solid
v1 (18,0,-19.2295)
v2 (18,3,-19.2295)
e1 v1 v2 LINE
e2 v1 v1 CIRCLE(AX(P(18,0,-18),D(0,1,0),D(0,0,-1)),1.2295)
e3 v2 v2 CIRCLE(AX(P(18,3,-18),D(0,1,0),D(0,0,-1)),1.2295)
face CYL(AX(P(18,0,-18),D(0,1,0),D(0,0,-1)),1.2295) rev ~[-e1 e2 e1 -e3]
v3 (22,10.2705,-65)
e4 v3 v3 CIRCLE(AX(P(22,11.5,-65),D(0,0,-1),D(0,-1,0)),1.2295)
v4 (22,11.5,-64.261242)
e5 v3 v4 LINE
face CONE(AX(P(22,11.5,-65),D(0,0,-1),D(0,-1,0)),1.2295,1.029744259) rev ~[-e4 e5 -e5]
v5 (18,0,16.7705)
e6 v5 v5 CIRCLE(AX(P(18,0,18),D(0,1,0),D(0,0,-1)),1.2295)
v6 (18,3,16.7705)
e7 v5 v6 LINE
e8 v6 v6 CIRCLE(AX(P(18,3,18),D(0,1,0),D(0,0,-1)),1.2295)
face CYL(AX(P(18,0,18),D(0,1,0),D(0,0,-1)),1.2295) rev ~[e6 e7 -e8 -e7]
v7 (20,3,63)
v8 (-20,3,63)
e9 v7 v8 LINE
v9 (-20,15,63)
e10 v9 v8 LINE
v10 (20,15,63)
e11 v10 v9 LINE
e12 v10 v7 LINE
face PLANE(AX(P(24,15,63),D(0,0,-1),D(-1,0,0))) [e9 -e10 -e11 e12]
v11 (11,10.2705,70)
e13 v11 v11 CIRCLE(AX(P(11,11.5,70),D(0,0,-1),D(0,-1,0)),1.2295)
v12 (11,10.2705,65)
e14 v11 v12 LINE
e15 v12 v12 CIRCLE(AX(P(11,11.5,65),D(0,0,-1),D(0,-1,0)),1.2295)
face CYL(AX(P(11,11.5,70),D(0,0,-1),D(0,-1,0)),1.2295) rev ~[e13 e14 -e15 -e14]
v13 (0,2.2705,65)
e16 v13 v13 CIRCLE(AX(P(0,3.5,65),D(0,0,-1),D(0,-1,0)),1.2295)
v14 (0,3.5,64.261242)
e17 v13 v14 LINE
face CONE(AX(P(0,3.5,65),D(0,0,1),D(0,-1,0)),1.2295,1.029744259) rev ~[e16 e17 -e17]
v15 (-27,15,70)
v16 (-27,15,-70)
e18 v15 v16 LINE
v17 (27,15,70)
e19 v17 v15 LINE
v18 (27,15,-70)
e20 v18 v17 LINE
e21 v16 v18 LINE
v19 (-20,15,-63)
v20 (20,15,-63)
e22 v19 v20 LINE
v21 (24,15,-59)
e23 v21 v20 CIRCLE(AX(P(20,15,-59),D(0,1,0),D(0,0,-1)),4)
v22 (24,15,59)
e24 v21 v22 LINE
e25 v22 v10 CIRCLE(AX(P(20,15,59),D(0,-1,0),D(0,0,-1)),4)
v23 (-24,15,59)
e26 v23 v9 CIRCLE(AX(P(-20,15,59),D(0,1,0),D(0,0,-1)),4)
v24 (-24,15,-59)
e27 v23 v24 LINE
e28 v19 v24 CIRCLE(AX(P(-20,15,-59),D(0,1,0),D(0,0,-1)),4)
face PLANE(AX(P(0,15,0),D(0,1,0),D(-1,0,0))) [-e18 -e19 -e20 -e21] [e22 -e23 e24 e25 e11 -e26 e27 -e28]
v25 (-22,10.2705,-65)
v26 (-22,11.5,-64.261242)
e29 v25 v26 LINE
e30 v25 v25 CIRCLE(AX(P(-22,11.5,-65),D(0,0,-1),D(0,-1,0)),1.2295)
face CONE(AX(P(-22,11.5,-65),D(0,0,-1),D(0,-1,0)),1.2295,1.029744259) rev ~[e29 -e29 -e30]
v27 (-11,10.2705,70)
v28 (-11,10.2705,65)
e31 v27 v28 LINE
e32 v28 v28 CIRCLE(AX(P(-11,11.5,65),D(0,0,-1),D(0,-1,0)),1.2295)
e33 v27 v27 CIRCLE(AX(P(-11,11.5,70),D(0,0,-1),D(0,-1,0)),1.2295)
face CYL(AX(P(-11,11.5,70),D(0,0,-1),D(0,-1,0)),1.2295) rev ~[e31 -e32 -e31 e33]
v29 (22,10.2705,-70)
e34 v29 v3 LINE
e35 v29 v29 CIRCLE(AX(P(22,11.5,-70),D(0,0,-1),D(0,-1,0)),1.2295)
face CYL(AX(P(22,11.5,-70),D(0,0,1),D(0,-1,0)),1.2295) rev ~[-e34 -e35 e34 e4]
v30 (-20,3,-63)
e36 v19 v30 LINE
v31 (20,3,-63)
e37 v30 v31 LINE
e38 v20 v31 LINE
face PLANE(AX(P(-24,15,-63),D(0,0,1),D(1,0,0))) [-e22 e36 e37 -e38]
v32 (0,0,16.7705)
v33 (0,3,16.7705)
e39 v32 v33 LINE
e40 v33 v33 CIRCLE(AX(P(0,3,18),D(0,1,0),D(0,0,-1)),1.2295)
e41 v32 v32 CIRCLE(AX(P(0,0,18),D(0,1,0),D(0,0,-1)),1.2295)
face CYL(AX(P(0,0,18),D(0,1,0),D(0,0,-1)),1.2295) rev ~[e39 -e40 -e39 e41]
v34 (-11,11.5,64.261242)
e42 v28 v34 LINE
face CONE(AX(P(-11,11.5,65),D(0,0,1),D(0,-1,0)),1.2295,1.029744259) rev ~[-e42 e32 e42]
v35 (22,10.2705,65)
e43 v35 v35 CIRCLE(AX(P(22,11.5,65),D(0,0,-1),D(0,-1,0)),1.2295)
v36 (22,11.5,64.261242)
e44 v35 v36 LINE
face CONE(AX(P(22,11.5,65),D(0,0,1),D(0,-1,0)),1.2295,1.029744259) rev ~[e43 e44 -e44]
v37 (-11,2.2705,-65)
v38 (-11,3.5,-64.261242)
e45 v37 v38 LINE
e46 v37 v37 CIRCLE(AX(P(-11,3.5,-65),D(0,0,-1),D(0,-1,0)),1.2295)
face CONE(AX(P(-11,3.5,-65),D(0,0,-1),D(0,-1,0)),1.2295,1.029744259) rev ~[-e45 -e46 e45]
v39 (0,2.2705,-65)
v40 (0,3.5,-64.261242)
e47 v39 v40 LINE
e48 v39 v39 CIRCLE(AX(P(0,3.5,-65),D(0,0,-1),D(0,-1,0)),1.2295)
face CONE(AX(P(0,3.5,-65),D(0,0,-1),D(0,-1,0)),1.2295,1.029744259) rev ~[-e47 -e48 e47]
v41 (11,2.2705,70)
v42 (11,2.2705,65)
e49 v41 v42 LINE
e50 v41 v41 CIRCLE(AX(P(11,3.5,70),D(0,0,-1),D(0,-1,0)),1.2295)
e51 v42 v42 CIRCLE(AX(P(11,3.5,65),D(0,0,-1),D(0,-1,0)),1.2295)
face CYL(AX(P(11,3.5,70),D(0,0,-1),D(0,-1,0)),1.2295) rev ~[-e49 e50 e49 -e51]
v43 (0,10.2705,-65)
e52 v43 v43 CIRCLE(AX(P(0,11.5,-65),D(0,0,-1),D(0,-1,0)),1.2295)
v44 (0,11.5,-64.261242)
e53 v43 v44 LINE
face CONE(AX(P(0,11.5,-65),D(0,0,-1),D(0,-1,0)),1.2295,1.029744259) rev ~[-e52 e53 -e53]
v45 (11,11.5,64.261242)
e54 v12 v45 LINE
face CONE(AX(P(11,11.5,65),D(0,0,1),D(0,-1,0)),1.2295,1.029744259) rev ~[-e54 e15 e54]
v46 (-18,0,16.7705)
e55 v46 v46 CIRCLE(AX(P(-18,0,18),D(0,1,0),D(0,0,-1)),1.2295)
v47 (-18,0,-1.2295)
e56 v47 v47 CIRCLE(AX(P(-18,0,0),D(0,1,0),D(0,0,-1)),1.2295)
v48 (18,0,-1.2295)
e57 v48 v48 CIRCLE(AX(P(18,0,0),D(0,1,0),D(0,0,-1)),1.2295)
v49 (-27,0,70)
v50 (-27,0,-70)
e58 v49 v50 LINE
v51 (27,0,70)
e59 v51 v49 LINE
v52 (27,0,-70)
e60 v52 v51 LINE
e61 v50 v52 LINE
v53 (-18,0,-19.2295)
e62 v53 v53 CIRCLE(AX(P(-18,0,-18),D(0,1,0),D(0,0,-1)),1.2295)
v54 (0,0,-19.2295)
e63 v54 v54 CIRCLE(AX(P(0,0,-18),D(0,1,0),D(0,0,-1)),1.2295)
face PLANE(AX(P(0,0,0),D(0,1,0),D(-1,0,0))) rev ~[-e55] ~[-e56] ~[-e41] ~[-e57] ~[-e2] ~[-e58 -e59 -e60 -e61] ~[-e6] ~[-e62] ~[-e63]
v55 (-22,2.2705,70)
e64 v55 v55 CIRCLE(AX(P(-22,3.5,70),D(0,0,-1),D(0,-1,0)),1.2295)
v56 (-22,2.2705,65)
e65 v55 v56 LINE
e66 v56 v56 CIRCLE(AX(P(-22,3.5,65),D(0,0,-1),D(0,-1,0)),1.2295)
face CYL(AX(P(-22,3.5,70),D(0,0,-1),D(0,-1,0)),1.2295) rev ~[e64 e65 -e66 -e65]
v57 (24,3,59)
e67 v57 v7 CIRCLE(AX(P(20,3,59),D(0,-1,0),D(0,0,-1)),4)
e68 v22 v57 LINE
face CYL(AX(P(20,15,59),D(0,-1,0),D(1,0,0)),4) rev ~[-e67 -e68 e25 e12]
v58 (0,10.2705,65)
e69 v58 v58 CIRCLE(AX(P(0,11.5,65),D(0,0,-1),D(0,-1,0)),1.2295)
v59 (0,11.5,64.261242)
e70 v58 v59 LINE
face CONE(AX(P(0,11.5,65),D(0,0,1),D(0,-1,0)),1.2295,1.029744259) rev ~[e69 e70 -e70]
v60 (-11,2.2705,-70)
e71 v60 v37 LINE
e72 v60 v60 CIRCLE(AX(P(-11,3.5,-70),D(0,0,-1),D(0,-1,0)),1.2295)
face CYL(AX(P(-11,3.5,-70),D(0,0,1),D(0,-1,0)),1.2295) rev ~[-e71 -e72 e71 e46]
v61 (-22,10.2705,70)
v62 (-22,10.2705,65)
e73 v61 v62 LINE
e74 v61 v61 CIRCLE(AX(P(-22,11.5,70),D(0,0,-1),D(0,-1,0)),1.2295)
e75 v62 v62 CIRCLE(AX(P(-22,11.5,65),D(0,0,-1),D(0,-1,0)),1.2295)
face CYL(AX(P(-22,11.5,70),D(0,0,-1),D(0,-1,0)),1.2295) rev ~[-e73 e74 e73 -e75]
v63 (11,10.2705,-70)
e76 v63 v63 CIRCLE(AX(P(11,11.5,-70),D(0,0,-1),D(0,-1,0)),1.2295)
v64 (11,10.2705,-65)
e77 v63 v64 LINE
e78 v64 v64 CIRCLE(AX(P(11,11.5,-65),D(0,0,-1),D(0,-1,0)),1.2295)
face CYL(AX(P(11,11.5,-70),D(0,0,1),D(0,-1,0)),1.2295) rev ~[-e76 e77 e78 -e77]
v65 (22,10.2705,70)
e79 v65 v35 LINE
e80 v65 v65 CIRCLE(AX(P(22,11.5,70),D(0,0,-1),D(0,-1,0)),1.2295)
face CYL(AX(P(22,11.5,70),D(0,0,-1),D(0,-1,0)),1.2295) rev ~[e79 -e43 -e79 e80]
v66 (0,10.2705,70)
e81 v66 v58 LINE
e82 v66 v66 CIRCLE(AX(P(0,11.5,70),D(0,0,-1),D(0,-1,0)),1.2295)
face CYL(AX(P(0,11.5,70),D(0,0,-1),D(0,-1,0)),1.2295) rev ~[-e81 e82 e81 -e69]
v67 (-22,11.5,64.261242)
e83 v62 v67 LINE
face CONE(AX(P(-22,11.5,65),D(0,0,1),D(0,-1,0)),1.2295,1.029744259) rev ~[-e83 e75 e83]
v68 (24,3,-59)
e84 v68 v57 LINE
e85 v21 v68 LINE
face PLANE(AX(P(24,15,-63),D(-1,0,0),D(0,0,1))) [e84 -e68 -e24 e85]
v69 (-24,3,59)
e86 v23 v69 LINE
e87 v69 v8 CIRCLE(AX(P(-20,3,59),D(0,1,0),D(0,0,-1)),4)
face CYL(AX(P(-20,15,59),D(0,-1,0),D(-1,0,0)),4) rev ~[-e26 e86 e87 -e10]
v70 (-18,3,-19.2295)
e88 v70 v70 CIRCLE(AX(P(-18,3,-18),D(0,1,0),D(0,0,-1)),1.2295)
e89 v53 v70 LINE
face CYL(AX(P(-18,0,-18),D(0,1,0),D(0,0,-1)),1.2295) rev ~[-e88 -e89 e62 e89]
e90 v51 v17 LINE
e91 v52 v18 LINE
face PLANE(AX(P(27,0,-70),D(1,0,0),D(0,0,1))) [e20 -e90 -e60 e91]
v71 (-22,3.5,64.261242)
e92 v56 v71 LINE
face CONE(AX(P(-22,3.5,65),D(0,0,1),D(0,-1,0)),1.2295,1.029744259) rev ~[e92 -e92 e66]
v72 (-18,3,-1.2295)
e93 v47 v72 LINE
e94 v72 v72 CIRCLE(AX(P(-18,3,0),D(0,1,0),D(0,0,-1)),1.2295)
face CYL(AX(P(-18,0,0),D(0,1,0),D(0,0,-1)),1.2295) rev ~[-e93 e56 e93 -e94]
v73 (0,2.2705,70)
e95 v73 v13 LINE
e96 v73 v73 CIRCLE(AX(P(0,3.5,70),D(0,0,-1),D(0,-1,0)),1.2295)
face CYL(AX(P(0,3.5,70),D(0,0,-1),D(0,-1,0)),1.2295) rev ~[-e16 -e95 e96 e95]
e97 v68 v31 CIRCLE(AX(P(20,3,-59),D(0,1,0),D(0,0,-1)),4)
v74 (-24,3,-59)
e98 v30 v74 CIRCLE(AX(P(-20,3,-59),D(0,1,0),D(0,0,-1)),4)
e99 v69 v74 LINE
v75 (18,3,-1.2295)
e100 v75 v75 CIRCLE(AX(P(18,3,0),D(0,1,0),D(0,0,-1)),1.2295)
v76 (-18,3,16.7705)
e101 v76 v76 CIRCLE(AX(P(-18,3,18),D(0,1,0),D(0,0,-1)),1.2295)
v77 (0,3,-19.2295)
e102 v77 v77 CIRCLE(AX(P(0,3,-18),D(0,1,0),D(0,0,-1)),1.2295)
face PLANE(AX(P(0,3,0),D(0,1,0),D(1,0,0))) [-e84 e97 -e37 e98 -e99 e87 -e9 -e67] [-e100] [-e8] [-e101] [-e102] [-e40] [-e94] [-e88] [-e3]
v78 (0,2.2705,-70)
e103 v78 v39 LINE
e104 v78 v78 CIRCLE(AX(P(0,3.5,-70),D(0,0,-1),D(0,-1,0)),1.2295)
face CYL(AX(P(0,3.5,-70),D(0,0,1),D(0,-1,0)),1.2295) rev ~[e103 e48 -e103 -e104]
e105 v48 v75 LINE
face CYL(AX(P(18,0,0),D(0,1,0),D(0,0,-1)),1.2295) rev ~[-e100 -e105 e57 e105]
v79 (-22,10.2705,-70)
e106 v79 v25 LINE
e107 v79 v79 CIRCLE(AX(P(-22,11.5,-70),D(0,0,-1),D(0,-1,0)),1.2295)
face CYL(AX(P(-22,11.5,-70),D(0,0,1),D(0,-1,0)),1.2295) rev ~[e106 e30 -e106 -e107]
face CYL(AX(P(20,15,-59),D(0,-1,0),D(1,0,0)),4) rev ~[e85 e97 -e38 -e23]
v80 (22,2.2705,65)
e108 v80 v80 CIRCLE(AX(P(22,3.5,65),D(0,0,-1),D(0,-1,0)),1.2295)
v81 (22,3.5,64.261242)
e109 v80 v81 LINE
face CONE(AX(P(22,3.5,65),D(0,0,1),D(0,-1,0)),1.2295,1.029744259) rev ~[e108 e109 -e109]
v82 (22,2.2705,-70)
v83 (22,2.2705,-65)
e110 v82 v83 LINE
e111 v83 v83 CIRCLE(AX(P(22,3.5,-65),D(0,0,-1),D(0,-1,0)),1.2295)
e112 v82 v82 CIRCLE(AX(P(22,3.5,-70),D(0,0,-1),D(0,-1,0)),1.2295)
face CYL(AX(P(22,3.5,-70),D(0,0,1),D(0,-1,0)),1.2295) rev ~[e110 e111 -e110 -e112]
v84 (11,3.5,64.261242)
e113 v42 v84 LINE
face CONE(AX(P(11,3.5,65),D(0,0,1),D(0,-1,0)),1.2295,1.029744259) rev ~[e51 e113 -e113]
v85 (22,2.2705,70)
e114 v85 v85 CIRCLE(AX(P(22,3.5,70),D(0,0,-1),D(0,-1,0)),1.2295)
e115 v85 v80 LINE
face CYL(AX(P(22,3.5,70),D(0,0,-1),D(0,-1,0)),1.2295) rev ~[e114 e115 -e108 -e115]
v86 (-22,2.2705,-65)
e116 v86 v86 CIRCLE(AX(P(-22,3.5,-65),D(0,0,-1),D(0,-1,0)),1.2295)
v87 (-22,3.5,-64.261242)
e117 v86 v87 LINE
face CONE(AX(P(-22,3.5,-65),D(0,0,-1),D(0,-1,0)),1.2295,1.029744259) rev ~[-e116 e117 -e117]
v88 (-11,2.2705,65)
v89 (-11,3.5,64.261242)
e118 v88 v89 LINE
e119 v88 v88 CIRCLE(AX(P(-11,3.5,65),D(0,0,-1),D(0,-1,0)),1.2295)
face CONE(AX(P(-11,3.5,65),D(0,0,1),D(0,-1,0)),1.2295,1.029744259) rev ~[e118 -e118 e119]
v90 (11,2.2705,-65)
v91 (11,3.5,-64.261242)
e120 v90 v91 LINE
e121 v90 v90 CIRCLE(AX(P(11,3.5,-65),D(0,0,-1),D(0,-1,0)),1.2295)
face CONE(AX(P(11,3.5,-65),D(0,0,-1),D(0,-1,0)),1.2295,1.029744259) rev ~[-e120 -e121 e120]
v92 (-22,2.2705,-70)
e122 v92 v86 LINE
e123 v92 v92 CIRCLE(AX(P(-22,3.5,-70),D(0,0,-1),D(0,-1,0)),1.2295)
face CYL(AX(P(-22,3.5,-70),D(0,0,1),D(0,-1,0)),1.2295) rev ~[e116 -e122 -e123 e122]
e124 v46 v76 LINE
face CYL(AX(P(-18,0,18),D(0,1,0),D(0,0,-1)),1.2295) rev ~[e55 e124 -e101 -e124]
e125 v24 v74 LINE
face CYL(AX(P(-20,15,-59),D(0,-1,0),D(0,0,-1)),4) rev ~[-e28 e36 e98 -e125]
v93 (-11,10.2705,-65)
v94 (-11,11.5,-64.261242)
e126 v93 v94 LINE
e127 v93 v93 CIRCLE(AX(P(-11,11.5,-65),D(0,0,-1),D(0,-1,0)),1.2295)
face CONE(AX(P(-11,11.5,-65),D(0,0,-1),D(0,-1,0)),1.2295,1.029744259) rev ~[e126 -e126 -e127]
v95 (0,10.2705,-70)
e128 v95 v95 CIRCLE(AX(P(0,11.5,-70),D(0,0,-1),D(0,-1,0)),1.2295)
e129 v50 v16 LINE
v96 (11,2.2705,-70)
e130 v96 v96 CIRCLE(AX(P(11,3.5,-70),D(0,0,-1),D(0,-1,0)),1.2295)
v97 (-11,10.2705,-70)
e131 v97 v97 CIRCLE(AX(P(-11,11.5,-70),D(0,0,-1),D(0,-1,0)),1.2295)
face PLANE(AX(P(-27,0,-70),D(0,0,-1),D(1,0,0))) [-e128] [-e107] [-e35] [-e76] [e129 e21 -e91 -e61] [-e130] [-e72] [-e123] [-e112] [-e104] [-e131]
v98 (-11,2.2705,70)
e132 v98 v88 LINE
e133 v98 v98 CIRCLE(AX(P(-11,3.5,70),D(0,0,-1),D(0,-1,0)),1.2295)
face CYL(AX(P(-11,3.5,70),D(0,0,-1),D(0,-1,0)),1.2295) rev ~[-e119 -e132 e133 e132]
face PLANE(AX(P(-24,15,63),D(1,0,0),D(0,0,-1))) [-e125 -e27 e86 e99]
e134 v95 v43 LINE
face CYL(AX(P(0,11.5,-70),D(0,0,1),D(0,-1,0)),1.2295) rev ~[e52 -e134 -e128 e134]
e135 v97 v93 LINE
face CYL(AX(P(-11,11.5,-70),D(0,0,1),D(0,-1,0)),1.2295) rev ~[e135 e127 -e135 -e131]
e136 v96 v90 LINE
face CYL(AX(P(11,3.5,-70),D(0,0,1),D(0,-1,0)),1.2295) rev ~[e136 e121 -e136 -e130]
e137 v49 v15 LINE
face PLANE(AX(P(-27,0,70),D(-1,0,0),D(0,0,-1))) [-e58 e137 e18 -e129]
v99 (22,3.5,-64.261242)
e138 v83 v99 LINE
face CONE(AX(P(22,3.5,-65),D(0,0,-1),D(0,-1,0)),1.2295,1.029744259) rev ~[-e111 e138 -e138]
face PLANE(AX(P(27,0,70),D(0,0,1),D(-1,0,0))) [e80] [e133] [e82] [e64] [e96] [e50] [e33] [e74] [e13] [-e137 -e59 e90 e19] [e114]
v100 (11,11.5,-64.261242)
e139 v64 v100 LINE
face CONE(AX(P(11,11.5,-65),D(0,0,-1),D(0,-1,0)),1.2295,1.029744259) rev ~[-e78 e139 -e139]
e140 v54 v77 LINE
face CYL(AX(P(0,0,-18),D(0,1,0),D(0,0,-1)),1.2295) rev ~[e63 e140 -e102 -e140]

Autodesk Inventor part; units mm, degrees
ref_plane "YZ Plane" through (0, 0, 0) normal (1, 0, 0) x (0, 1, 0)
ref_plane "XZ Plane" through (0, 0, 0) normal (0, 1, 0) x (-1, 0, 0)
ref_plane "XY Plane" through (0, 0, 0) normal (0, 0, 1) x (1, 0, 0)
sketch "Skizze1" plane through (0, 0, 0) normal (0, 1, 0) x (-1, 0, 0)
  line L0 (-27, 70) -> (27, 70)
  line L1 (27, 70) -> (27, -70)
  line L2 (27, -70) -> (-27, -70)
  line L3 (-27, -70) -> (-27, 70)
  line L4 (-27, 70) -> (27, -70) construction
  line L5 (27, 70) -> (-27, -70) construction
  point P0 (0, 0)
  dimension "d0" = 54
  dimension "d1" = 140
extrude "Extrusion1" add sketch "Skizze1" along normal blind 15
sketch "Skizze2" plane through (0, 15, 0) normal (0, 1, 0) x (1, 0, 0)
  line L0 (24, -63) -> (-24, -63)
  line L1 (-24, -63) -> (-24, 63)
  line L2 (-24, 63) -> (24, 63)
  line L3 (24, 63) -> (24, -63)
  line L4 (24, -63) -> (-24, 63) construction
  line L5 (-24, -63) -> (24, 63) construction
  line L6 (-27, -70) -> (27, -70) projected
  line L7 (27, -70) -> (27, 70) projected
  line L8 (27, 70) -> (-27, 70) projected
  line L9 (-27, 70) -> (-27, -70) projected
  point P0 (0, 0)
  dimension "d4" = 3
  dimension "d7" = 7
extrude "Extrusion2" cut sketch "Skizze2" against normal blind 12 contours L0 L1 L2 L3
sketch "Skizze4" plane through (-27, 0, 70) normal (0, 0, 1) x (1, 0, 0)
  line L0 (54, 0) -> (0, 0) projected
  line L1 (54, 0) -> (54, 15) projected
  line L2 (0, 15) -> (54, 15) projected
  line L3 (0, 0) -> (0, 15) projected
  point P0 (27, 3.5)
  dimension "d23" = 3.5
hole "Bohrung1" at (0, 3.5, 70) direction (0, 0, -1) diameter 2.459 depth 5 tip angle 118 thread size "M3x0.5" class "6H" standard "ISO Metric profile"
pattern_linear "Rechteckige Anordnung1" count 5 spacing 11 along (-1, 0, 0) count 2 spacing 8 along (0, 1, 0) of "Bohrung1" first direction both ways yes
mirror "Spiegeln1" about plane through (0, 0, 0) normal (0, 0, 1) of "Extrusion2", "Bohrung1", "Rechteckige Anordnung1"
sketch "Skizze6" plane through (0, 0, 0) normal (0, -1, 0) x (1, 0, 0)
  line L0 (-18, 18) -> (18, 18)
  line L1 (18, 18) -> (18, -18)
  line L2 (18, -18) -> (-18, -18)
  line L3 (-18, -18) -> (-18, 18)
  line L4 (-18, 18) -> (18, -18) construction
  line L5 (18, 18) -> (-18, -18) construction
  line L6 (0, 18) -> (0, -18) construction
  line L7 (-18, 0) -> (18, 0) construction
  point P0 (0, 0)
  dimension "d47" = 36
  dimension "d48" = 36
hole "Bohrung2" at (18, 0, 18) at (18, 0, 0) at (18, 0, -18) at (0, 0, -18) at (-18, 0, -18) at (-18, 0, 0) at (-18, 0, 18) at (0, 0, 18) direction (0, 1, 0) diameter 2.459 depth 8.8 tip angle 118 thread size "M3x0.5" class "6H" standard "ISO Metric profile"
fillet "Rundung2" radius 4 4 edges at (-24, 9, -63) (24, 9, -63) (24, 9, 63) (-24, 9, 63)
properties part number "dynamixel_pro_frame_part1" material "Aluminium 6061"
